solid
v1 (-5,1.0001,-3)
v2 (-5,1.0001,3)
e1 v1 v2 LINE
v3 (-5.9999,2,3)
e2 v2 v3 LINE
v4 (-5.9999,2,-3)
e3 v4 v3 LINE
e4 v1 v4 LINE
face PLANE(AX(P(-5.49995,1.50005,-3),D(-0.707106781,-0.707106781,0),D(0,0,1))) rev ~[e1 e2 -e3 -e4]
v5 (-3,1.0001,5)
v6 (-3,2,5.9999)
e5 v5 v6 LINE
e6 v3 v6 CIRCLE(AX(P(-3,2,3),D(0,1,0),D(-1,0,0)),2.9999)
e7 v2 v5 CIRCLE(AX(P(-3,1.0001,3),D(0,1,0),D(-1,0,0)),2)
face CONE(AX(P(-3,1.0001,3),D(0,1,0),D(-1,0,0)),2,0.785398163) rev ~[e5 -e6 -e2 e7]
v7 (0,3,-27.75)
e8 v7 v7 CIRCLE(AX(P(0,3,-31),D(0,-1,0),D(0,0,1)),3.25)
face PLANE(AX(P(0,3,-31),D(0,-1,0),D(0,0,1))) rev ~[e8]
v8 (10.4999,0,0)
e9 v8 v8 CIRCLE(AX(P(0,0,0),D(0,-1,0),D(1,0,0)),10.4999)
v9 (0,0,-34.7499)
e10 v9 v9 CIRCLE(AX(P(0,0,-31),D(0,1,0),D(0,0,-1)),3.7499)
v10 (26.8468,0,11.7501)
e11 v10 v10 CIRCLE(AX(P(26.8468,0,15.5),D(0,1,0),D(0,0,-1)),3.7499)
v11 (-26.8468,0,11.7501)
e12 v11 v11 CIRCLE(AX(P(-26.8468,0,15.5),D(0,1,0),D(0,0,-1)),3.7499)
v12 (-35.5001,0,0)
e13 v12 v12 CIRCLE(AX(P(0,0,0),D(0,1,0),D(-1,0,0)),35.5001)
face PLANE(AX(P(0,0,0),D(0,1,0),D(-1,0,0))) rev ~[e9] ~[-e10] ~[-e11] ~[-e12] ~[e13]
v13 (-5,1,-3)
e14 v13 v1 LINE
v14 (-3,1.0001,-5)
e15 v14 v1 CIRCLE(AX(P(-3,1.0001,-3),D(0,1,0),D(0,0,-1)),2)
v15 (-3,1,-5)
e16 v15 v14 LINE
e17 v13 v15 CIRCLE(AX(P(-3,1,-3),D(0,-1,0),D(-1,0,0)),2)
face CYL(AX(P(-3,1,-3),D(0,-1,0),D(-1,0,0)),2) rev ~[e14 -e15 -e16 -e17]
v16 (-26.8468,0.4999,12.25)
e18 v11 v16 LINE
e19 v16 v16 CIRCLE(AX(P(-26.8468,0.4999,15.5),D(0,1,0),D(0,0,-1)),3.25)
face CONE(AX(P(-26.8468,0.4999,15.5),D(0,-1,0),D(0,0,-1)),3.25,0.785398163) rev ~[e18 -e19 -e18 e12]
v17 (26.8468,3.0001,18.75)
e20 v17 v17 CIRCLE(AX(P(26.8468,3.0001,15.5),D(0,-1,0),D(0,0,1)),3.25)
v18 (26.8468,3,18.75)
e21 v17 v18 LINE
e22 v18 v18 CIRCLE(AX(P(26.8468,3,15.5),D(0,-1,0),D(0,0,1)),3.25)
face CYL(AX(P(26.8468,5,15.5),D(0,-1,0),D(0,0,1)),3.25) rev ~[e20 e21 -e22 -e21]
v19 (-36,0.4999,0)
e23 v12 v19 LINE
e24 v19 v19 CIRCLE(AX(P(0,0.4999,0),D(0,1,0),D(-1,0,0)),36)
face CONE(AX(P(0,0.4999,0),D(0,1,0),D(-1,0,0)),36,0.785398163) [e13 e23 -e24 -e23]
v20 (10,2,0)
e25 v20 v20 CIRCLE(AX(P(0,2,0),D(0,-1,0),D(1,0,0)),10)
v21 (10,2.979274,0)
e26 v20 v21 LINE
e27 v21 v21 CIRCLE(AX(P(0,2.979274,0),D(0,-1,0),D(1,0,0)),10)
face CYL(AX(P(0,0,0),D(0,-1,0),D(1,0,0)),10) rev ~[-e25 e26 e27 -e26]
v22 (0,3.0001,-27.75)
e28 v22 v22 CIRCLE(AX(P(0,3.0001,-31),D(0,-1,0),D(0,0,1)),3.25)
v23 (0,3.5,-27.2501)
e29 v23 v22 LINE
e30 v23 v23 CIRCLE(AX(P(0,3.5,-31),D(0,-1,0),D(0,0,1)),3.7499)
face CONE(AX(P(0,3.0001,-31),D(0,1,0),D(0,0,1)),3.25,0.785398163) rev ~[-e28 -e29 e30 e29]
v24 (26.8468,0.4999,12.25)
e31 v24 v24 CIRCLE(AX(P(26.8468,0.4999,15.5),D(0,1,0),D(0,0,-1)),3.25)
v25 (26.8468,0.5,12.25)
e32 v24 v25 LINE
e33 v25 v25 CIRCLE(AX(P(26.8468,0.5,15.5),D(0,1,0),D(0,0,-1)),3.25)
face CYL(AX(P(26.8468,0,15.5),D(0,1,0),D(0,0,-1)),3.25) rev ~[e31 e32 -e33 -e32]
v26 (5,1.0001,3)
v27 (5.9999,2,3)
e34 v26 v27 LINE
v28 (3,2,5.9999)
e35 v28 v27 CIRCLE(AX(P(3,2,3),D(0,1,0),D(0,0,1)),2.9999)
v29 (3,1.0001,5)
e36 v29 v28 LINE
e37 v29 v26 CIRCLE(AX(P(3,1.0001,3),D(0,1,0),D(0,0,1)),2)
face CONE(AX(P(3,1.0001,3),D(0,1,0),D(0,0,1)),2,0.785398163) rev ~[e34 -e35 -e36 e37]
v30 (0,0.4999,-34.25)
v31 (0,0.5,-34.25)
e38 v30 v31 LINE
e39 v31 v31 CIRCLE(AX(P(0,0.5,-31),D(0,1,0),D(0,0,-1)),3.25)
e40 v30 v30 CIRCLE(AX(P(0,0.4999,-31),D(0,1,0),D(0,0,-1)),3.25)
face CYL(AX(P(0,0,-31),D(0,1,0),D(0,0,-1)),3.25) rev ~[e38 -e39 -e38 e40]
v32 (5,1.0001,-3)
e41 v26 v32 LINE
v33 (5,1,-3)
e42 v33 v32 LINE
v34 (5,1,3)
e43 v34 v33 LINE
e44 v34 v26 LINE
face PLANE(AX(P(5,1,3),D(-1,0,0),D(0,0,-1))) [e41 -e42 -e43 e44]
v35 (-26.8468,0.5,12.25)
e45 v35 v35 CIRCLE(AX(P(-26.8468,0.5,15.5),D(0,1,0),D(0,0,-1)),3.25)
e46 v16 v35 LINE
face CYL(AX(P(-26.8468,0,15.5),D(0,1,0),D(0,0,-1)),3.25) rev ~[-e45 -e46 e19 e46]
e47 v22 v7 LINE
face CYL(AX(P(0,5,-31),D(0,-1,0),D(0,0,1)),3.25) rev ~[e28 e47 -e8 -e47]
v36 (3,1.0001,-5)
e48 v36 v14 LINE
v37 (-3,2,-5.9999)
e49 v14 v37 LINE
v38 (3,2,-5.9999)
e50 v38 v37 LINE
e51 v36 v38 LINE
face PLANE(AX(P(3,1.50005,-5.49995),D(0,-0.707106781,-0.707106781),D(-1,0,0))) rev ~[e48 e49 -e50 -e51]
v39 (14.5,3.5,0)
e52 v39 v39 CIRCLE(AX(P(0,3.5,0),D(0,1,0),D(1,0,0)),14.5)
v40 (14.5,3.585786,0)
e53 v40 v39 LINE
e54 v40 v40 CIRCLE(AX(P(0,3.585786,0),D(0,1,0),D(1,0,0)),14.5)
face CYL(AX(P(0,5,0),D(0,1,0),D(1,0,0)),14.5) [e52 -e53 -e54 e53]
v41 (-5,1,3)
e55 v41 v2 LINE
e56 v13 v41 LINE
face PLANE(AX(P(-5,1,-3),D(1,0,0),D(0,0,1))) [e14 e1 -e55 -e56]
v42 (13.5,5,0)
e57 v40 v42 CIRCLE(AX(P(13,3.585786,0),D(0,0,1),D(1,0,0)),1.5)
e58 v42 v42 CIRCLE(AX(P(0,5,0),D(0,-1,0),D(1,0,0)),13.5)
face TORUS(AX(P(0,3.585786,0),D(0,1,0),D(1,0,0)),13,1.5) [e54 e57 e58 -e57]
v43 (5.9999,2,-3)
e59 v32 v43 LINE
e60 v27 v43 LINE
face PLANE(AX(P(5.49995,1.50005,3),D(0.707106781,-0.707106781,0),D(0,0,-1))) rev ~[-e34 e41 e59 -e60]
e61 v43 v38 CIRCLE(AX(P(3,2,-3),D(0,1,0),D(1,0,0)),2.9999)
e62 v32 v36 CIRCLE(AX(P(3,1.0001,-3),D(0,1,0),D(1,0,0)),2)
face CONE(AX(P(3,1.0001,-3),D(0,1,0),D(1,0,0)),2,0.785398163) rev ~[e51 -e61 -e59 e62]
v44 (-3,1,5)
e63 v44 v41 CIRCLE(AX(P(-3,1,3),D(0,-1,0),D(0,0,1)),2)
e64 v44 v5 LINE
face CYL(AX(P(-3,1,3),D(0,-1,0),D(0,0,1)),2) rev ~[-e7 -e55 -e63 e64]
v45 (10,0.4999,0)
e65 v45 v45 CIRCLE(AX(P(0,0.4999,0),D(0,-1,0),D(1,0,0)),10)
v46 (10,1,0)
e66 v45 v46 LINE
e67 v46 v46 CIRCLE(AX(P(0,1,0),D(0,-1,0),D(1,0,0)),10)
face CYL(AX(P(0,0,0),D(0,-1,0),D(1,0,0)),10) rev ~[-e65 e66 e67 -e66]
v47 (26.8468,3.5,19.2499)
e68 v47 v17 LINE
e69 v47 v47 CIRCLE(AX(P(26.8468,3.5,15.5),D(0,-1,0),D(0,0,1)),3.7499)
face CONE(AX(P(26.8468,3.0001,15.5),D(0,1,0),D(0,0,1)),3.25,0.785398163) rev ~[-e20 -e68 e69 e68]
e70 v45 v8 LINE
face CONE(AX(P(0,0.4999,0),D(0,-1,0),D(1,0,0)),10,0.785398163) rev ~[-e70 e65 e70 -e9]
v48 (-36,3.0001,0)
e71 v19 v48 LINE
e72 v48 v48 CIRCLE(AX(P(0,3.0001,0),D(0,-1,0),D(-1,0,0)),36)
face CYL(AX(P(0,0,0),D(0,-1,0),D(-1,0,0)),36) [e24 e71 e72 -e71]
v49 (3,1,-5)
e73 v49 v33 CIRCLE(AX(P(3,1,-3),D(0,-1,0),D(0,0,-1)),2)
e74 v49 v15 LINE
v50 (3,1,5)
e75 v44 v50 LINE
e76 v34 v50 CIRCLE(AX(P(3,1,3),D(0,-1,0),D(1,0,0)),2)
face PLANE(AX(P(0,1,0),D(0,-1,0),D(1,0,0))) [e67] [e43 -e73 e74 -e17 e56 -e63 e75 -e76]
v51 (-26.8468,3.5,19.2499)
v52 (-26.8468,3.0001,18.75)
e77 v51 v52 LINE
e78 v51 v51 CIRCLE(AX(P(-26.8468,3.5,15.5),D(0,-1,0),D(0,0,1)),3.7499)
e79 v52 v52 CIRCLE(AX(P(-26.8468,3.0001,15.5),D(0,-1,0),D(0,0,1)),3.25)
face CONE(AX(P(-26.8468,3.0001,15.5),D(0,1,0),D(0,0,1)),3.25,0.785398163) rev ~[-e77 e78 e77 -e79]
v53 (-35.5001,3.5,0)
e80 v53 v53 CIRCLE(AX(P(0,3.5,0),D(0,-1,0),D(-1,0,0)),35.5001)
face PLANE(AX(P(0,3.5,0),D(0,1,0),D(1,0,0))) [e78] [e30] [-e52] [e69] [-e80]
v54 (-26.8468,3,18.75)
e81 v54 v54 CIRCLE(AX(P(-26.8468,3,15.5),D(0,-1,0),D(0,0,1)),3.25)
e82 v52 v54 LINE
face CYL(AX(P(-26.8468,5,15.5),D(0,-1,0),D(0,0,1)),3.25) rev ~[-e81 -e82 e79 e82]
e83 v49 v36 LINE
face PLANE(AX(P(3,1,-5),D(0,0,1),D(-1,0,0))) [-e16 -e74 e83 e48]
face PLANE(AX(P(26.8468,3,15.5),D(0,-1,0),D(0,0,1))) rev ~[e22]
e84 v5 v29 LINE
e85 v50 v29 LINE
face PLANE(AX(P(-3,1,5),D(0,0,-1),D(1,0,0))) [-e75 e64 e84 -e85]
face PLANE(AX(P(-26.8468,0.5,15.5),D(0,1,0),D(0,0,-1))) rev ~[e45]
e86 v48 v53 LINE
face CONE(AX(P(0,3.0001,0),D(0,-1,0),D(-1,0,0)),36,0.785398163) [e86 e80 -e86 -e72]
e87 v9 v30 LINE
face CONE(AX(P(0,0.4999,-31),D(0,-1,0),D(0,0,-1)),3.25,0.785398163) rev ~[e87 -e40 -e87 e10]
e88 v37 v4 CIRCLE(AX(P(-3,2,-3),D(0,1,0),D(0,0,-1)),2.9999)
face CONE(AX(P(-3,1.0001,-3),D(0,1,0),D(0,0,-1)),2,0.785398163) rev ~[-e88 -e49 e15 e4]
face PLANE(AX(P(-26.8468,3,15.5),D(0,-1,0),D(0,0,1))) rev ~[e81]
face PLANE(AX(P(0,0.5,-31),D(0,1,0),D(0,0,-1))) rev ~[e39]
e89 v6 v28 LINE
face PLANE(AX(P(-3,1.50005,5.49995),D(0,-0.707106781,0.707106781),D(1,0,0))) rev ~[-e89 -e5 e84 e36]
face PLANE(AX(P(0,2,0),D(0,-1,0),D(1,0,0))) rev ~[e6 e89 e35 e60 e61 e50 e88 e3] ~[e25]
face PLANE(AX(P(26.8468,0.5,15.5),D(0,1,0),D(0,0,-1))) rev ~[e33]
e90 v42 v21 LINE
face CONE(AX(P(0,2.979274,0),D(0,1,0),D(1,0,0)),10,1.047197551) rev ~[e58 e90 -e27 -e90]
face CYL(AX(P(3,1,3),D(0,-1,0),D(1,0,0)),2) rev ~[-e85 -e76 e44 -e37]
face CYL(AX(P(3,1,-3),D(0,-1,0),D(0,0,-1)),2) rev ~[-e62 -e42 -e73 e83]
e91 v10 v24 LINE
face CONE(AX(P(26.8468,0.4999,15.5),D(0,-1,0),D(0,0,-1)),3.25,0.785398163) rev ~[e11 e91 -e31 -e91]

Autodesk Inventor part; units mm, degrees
ref_plane "YZ Plane" through (0, 0, 0) normal (1, 0, 0) x (0, 1, 0)
ref_plane "XZ Plane" through (0, 0, 0) normal (0, 1, 0) x (-1, 0, 0)
sketch "Main Platform" plane through (0, 0, 0) normal (0, 1, 0) x (-1, 0, 0)
  circle A0 centre (0, 0) radius 36
  dimension "d0" = 72
extrude "Main Platform Extrusion" add sketch "Main Platform" along normal blind 5
sketch "Main Hole" plane through (0, 0, 0) normal (0, -1, 0) x (1, 0, 0)
  circle A0 centre (0, 0) radius 36 construction
  circle A1 centre (0, 0) radius 10
  dimension "d3" = 20
extrude "Main Hole Cutout" cut sketch "Main Hole" against normal through all
sketch "Bottom Magnet Holes (MASTER)" plane through (0, 0, 0) normal (0, -1, 0) x (1, 0, 0)
  circle A0 centre (0, 0) radius 10 construction
  circle A1 centre (0, 0) radius 36 construction
  circle A2 centre (0, 0) radius 36 construction
  line L0 (0, -50.4) -> (0, 50.4) construction
  line L1 (0, 36) -> (0, -36) construction
  circle A3 centre (0, 0) radius 31 construction
  line L2 (0, 0) -> (26.8468, 15.5) construction
  line L3 (0, 0) -> (-26.8468, 15.5) construction
  line L4 (0, 0) -> (0, -31) construction
  dimension "d37" = 5
  dimension "d38" = 120
  dimension "d39" = 120
chamfer "Saline Well" distance 3.5 angle 30 1 edges at (-10, 5, 0) measured on face at (-27.0099, 5, -2.7674)
sketch "Top Magnet Holes" plane through (0, 5, 0) normal (0, 1, 0) x (1, 0, 0)
  circle A0 centre (0, 0) radius 31 construction
  point P0 (26.8468, -15.5)
  point P1 (-26.8468, -15.5)
  point P2 (0, 31)
ref_plane "Shim Holder Plane" through (0, 1, 0) normal (0, -1, 0) x (1, 0, 0)
sketch "Shim Holder" plane through (0, 1, 0) normal (0, -1, 0) x (1, 0, 0)
  circle A0 centre (0, 0) radius 36 construction
  circle A1 centre (0, 0) radius 13.5 construction
  circle A2 centre (0, 0) radius 15
  dimension "d137" = 30
extrude "Shim Holder Extrusion" add sketch "Shim Holder" against normal blind 1
sketch "Sketch22" plane through (0, 5, 0) normal (0, 1, 0) x (1, 0, 0)
  circle A0 centre (0, 0) radius 36 construction
  circle A1 centre (0, 0) radius 13.5 construction
  circle A2 centre (0, 0) radius 14.5
  circle A3 centre (0, 0) radius 36
  dimension "d110" = 1
extrude "Saline Well Recess" cut sketch "Sketch22" against normal blind 1.5
fillet "Fillet4" radius 1.5 1 edges at (-14.5, 5, 0)
hole "Top Magnet Recess" at (26.8468, 5, 15.5) at (0, 5, -31) at (-26.8468, 5, 15.5) direction (0, -1, 0) diameter 6.5 depth 2
hole "Bottom Magnet Recess" at (26.8468, 0, 15.5) at (0, 0, -31) at (-26.8468, 0, 15.5) direction (0, 1, 0) diameter 6.5 depth 0.5
chamfer "Chamfer6" distance 0.5 angle 45 9 edges at (36, 0, 0) (0, 0, -27.75) (26.8468, 0, 18.75) (-26.8468, 0, 18.75) (36, 3.5, 0) (-26.8468, 3.5, 12.25) (26.8468, 3.5, 12.25) (0, 3.5, -34.25) (-10, 0, 0)
sketch "Sketch25" plane through (0, 1, 0) normal (0, -1, 0) x (1, 0, 0)
  line L0 (-3, 5) -> (3, 5)
  line L1 (5, 3) -> (5, -3)
  line L2 (3, -5) -> (-3, -5)
  line L3 (-5, -3) -> (-5, 3)
  line L4 (-5, 5) -> (5, -5) construction
  line L5 (5, 5) -> (-5, -5) construction
  arc A0 (3, -5) -> (5, -3) centre (3, -3) ccw
  arc A1 (-5, -3) -> (-3, -5) centre (-3, -3) ccw
  arc A2 (-3, 5) -> (-5, 3) centre (-3, 3) ccw
  arc A3 (5, 3) -> (3, 5) centre (3, 3) ccw
  point P0 (0, 0)
  point P1 (0, 0)
  dimension "d140" = 10
  dimension "d141" = 10
  dimension "d142" = 2
extrude "Extrusion14" cut sketch "Sketch25" against normal through all
chamfer "Chamfer9" distance 1 angle 45 8 edges at (5, 2, 0) (4.4142, 2, 4.4142) (0, 2, 5) (-4.4142, 2, 4.4142) (-5, 2, 0) (-4.4142, 2, -4.4142) (0, 2, -5) (4.4142, 2, -4.4142)
properties part number "flat_platform_v1_mm"
